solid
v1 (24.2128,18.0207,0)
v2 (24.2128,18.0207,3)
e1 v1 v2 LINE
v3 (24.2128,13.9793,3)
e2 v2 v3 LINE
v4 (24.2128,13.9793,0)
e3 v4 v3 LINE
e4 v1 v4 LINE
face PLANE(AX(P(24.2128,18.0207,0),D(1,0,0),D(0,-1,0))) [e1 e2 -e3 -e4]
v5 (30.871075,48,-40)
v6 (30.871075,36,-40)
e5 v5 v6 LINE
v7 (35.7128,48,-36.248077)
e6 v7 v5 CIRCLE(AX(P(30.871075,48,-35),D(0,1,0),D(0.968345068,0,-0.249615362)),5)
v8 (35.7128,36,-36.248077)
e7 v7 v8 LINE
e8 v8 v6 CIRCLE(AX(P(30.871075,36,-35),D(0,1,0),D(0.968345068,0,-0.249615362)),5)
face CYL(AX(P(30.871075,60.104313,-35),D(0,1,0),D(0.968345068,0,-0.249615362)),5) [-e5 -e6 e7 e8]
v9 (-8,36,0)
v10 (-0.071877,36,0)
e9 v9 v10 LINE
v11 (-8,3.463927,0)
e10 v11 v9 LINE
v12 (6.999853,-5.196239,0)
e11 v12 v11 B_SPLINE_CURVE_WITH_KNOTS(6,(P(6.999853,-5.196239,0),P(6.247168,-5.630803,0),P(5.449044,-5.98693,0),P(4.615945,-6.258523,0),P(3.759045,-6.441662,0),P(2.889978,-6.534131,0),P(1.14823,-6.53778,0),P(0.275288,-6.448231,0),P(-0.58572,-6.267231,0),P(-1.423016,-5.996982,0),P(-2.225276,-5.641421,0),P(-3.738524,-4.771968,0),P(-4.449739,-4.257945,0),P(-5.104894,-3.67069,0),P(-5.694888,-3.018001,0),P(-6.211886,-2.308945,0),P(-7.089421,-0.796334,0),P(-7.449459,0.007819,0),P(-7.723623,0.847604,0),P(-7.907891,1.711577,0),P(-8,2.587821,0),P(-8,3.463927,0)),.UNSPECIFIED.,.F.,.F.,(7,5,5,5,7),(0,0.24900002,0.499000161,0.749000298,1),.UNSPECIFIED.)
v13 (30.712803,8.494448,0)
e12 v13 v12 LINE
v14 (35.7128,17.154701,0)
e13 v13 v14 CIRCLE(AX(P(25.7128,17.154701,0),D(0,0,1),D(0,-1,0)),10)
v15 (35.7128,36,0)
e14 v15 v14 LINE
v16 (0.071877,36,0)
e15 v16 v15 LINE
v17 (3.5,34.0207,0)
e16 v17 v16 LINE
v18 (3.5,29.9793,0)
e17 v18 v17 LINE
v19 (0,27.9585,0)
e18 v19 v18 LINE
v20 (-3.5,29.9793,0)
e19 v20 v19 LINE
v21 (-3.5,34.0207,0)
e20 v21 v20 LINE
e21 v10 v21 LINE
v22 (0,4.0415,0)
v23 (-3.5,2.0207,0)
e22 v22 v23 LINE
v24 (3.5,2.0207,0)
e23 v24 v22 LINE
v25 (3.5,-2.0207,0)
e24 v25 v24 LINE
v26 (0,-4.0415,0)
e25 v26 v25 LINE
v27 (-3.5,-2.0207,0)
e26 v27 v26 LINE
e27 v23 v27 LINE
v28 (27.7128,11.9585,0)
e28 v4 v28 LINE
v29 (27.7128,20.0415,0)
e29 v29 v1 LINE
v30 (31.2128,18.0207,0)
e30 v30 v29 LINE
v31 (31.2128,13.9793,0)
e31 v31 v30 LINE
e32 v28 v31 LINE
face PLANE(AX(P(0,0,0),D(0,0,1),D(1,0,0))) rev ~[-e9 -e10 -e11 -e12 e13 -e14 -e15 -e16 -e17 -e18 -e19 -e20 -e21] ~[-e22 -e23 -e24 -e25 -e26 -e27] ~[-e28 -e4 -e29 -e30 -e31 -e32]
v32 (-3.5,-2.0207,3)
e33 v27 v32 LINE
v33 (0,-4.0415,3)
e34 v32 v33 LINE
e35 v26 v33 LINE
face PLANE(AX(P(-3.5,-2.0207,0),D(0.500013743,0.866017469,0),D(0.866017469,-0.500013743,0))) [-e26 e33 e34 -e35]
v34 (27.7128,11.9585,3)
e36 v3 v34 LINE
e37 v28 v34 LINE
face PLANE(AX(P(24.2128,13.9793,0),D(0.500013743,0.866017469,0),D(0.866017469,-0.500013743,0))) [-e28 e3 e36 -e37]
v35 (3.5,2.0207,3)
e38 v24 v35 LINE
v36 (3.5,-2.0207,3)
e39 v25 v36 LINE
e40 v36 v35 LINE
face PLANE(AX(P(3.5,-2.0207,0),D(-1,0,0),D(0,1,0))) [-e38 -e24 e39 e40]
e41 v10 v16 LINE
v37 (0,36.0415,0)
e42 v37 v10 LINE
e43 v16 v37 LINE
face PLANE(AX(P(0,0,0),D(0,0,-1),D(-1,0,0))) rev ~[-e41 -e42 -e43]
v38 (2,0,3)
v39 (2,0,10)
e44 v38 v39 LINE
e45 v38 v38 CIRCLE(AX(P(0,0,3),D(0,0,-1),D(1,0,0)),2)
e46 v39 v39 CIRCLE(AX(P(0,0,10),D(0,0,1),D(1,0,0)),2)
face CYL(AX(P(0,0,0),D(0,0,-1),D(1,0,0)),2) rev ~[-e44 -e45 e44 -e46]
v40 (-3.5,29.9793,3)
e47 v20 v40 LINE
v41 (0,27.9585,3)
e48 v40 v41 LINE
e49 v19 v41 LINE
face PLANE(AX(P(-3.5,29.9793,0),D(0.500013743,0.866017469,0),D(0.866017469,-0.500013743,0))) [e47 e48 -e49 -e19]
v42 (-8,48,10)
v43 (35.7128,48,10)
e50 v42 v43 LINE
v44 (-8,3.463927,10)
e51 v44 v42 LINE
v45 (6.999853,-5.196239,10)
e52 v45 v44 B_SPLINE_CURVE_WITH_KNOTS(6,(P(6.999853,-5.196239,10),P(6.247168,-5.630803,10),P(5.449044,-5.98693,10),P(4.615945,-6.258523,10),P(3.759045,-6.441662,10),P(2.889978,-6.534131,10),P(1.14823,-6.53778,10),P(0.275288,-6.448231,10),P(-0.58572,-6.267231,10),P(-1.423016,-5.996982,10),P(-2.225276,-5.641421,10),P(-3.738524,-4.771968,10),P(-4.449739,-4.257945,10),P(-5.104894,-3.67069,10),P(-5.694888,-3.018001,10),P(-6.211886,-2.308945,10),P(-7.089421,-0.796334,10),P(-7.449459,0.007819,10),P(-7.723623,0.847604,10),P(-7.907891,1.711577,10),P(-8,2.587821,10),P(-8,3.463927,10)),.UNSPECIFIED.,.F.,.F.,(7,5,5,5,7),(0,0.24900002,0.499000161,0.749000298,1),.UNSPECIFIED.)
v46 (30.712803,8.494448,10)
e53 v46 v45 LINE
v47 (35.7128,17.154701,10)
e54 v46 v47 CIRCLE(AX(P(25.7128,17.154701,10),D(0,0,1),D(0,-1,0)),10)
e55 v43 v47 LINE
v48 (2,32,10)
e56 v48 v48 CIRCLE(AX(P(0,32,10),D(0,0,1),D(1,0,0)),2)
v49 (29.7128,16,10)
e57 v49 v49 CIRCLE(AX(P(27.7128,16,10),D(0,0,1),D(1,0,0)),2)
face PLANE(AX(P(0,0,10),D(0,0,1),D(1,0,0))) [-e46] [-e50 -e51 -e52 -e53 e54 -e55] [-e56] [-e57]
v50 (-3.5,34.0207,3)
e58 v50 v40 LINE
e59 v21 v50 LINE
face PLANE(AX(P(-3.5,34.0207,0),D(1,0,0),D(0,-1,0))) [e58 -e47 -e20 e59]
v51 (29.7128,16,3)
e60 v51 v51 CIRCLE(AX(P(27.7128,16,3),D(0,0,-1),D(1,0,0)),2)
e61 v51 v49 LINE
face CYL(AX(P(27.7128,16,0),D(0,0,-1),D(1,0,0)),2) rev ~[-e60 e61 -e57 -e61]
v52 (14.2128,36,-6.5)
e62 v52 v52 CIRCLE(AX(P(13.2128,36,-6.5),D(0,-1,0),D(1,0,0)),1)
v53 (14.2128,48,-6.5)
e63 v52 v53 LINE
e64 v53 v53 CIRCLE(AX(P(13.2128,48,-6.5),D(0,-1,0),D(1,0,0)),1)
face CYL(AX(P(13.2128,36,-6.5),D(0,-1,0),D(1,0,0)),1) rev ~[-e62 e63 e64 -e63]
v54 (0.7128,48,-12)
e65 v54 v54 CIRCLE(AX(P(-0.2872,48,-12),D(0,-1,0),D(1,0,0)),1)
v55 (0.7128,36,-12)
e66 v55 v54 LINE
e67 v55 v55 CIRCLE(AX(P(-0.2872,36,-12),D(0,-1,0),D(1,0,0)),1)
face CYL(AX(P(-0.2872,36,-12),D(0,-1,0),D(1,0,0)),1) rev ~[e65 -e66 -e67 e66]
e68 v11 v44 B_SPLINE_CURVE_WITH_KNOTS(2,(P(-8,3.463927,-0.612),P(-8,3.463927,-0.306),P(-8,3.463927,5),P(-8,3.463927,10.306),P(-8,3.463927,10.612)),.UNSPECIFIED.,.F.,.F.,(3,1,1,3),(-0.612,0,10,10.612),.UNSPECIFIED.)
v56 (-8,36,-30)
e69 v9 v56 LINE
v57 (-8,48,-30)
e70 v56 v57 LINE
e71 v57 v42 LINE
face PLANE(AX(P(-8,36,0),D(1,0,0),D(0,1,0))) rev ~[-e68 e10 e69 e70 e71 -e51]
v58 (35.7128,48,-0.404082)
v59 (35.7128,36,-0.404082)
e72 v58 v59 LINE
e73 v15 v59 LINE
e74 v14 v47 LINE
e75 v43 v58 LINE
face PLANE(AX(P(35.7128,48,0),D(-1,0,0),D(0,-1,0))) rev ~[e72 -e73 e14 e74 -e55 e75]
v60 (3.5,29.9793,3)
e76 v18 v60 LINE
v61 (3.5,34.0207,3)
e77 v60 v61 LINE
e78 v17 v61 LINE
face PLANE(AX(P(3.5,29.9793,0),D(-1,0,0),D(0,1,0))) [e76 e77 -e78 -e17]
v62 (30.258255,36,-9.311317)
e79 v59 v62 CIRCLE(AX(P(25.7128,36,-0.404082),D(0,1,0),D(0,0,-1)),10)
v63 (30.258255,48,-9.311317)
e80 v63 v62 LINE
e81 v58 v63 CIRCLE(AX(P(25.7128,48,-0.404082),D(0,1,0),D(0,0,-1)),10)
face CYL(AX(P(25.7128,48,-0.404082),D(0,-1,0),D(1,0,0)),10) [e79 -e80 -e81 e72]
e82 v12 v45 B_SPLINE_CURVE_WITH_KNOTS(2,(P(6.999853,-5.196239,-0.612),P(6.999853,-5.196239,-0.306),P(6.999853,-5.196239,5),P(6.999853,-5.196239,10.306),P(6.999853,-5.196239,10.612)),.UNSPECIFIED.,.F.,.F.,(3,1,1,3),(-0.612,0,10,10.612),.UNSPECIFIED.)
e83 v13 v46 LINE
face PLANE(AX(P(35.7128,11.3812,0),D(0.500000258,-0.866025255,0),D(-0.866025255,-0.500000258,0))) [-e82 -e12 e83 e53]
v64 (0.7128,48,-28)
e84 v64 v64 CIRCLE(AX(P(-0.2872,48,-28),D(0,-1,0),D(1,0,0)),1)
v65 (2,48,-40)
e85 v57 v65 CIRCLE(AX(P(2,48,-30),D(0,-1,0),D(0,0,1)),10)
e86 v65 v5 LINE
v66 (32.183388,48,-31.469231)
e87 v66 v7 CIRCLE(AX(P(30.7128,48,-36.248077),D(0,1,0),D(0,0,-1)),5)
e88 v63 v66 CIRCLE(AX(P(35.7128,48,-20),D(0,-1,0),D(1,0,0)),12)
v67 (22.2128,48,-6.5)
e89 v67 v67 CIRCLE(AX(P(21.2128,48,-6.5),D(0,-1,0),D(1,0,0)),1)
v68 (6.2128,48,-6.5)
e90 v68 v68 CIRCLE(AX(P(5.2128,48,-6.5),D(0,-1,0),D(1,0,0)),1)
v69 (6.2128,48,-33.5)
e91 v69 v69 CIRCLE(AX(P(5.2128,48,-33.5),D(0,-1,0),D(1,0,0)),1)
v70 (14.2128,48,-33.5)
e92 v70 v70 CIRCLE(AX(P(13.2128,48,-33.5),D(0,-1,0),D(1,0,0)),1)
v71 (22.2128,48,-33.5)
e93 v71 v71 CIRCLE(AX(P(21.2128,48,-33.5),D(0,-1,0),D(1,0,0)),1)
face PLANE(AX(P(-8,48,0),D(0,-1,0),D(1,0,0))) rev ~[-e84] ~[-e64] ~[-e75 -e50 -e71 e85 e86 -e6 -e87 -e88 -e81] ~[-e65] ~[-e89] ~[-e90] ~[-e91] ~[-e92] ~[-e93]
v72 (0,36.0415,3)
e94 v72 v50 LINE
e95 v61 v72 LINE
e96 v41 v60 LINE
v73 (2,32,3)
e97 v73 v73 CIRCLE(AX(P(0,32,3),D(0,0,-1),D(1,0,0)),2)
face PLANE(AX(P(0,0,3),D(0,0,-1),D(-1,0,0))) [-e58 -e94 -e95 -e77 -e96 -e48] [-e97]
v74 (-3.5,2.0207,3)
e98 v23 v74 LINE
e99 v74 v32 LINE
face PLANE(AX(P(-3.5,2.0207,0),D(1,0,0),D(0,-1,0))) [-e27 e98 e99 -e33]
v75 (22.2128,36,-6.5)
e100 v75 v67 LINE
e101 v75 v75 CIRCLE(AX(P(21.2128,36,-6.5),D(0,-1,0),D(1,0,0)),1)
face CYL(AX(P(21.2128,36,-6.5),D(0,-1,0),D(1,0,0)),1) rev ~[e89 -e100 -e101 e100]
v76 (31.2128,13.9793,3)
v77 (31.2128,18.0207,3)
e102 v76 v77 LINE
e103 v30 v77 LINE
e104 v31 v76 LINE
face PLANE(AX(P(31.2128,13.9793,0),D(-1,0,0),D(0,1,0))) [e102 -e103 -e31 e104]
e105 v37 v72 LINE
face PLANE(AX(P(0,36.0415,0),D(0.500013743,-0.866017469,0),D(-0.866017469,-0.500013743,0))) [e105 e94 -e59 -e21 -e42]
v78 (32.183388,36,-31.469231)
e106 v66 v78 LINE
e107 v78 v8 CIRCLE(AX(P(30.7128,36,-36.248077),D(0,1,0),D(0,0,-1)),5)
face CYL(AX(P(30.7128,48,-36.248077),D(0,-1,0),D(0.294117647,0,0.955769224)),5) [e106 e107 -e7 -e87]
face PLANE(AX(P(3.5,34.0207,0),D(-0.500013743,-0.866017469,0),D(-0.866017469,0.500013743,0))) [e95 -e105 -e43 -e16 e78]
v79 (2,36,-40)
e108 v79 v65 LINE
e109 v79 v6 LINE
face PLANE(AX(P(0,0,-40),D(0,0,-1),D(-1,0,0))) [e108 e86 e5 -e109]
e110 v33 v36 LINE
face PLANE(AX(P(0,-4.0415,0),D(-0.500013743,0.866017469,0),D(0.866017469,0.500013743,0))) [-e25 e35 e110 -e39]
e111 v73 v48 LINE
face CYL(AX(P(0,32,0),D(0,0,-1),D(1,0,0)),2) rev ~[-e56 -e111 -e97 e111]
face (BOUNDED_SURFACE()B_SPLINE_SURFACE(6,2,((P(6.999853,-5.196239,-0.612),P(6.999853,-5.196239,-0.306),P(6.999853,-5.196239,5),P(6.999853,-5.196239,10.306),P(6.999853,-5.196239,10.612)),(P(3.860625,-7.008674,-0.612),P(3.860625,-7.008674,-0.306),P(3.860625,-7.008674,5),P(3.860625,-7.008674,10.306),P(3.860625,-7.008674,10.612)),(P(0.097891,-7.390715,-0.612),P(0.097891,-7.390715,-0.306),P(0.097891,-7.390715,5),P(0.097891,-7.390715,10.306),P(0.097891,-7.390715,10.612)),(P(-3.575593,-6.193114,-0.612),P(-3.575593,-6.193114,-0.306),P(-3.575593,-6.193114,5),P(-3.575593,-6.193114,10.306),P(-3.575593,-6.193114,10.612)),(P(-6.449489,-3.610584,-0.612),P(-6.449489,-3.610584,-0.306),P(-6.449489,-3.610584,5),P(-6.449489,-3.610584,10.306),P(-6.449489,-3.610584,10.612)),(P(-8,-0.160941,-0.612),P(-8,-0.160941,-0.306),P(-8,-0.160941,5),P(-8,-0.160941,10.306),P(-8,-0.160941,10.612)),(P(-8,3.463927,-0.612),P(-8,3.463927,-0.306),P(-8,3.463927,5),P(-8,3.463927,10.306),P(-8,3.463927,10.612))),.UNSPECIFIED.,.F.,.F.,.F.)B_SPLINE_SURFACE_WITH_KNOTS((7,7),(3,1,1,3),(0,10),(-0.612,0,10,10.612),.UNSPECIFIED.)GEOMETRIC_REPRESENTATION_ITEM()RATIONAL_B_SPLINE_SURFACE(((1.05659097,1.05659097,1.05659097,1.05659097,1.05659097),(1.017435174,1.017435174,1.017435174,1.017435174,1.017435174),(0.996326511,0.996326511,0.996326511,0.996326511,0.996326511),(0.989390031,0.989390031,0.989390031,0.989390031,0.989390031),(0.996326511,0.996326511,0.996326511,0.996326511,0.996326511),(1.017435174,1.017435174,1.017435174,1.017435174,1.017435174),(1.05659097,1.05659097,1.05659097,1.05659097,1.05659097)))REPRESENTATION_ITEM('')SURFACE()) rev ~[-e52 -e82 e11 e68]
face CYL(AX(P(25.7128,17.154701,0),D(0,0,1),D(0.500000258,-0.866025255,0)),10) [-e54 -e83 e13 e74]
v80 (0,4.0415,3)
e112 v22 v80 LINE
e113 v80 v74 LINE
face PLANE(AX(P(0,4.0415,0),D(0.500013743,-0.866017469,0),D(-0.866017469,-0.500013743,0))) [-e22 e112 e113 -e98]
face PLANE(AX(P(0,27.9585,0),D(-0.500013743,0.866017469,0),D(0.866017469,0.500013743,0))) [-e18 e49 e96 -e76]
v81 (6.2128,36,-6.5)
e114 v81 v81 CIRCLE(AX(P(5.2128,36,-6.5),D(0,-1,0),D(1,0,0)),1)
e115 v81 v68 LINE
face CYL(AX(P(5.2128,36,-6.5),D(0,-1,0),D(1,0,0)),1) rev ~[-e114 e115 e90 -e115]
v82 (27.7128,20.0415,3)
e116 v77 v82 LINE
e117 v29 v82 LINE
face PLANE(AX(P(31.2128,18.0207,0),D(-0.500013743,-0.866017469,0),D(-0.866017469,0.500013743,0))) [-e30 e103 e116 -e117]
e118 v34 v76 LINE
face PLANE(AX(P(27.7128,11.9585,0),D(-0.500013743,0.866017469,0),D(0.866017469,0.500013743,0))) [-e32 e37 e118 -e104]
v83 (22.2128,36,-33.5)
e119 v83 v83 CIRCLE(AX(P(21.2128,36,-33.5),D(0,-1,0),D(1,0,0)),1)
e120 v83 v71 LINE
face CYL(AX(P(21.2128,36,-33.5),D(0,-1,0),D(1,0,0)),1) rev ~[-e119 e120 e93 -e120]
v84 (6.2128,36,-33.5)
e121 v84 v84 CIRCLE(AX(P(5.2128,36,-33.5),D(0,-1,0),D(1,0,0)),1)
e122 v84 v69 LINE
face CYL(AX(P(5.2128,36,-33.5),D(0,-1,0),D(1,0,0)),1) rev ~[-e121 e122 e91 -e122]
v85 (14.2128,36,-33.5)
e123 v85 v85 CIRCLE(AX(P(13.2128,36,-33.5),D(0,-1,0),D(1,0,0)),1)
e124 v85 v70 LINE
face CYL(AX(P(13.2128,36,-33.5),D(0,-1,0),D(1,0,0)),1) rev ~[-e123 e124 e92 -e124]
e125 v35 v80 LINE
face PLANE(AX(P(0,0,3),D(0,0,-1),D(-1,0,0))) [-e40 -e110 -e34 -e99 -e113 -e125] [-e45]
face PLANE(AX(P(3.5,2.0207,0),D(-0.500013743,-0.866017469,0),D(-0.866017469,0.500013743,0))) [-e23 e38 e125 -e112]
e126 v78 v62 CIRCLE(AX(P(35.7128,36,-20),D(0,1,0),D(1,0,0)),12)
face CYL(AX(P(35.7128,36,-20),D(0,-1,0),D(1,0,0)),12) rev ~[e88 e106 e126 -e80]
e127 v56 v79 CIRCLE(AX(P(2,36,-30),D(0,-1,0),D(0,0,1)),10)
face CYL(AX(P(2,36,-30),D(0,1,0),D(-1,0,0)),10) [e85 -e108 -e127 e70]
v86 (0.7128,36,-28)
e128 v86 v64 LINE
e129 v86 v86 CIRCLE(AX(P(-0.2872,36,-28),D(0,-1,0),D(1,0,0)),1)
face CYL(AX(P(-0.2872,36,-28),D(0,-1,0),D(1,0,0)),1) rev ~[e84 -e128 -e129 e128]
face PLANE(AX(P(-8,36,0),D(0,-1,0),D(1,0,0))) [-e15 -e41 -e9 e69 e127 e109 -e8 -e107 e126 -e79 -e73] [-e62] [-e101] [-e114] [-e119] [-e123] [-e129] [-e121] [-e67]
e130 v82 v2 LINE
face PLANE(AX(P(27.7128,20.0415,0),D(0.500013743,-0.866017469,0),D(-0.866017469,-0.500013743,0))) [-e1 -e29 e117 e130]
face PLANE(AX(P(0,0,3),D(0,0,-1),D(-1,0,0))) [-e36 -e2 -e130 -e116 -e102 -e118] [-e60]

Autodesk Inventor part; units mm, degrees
ref_plane "YZ Plane" through (0, 0, 0) normal (1, 0, 0) x (0, 1, 0)
ref_plane "XZ Plane" through (0, 0, 0) normal (0, 1, 0) x (-1, 0, 0)
ref_plane "XY Plane" through (0, 0, 0) normal (0, 0, 1) x (1, 0, 0)
sketch "Esquisse1" plane through (0, 0, 0) normal (0, 0, 1) x (1, 0, 0)
  line L0 (0, 0) -> (0, 32) construction
  line L1 (0, 32) -> (27.7128, 16) construction
  line L2 (27.7128, 16) -> (0, 0) construction
  circle A0 centre (0, 0) radius 2
  circle A1 centre (0, 32) radius 2
  circle A2 centre (27.7128, 16) radius 2
  line L3 (0, 32) -> (0, 48) construction
  line L4 (35.7128, 48) -> (35.7128, 11.3812)
  line L5 (2.1436, -8) -> (-8, -8)
  line L6 (-8, -8) -> (-8, 48)
  line L7 (-8, 48) -> (35.7128, 48)
  line L8 (27.7128, 16) -> (35.7128, 16) construction
  line L9 (0, 0) -> (0, -8) construction
  line L10 (0, 32) -> (-8, 32) construction
  line L11 (27.7128, 16) -> (31.7128, 9.0718) construction
  line L12 (35.7128, 11.3812) -> (2.1436, -8)
  dimension "d0" = 32
  dimension "d1" = 32
  dimension "d2" = 32
  dimension "d3" = 4
  dimension "d4" = 16
  dimension "d5" = 8
  dimension "d6" = 8
  dimension "d7" = 8
  dimension "d27" = 8
extrude "Extrusion1" add sketch "Esquisse1" along normal blind 10
sketch "Esquisse2" plane through (0, 0, 0) normal (0, 0, -1) x (-1, 0, 0)
  circle A0 centre (-27.7128, 16) radius 2 projected
  circle A1 centre (0, 32) radius 2 projected
  circle A2 centre (0, 0) radius 2 projected
  line L0 (-35.7128, 48) -> (-35.7128, -8) projected
  line L1 (8, -8) -> (8, 48) projected
  line L2 (8, 48) -> (-35.7128, 48) projected
  line L3 (0, 27.9585) -> (-3.5, 29.9793)
  line L4 (-3.5, 29.9793) -> (-3.5, 34.0207)
  line L5 (-3.5, 34.0207) -> (0, 36.0415)
  line L6 (0, 36.0415) -> (3.5, 34.0207)
  line L7 (3.5, 34.0207) -> (3.5, 29.9793)
  line L8 (3.5, 29.9793) -> (0, 27.9585)
  line L9 (-3.5, 2.0207) -> (0, 4.0415)
  line L10 (0, 4.0415) -> (3.5, 2.0207)
  line L11 (3.5, 2.0207) -> (3.5, -2.0207)
  line L12 (3.5, -2.0207) -> (0, -4.0415)
  line L13 (0, -4.0415) -> (-3.5, -2.0207)
  line L14 (-3.5, -2.0207) -> (-3.5, 2.0207)
  line L15 (-3.5, 29.9793) -> (3.5, 29.9793) construction
  line L16 (-24.2128, 13.9793) -> (-27.7128, 11.9585)
  line L17 (-27.7128, 11.9585) -> (-31.2128, 13.9793)
  line L18 (-31.2128, 13.9793) -> (-31.2128, 18.0207)
  line L19 (-31.2128, 18.0207) -> (-27.7128, 20.0415)
  line L20 (-27.7128, 20.0415) -> (-24.2128, 18.0207)
  line L21 (-24.2128, 18.0207) -> (-24.2128, 13.9793)
  point P0 (-2.1436, -8)
  dimension "d10" = 7
extrude "Extrusion2" cut sketch "Esquisse2" against normal blind 3
sketch "Esquisse5" plane through (0, 0, 0) normal (0, 0, -1) x (-1, 0, 0)
  line L0 (-35.7128, 48) -> (-35.7128, 11.3812) projected
  line L1 (8, -8) -> (8, 48) projected
  line L2 (8, 48) -> (-35.7128, 48) projected
  line L3 (-35.7128, 48) -> (8, 48)
  line L4 (8, 48) -> (8, 36)
  line L5 (8, 36) -> (-35.7128, 36)
  line L6 (-35.7128, 36) -> (-35.7128, 48)
  point P0 (0, 0)
  dimension "d28" = 12
extrude "Extrusion5" add sketch "Esquisse5" along normal blind 40
sketch "Esquisse6" plane through (0.0718, 36, 0) normal (0, -1, 0) x (1, 0, 0)
  line L0 (-8.0718, 0) -> (-8.0718, -40) projected
  line L1 (35.641, 0) -> (35.641, -40) projected
  line L2 (35.641, -20) -> (-8.0718, -20) construction
  circle A0 centre (35.641, -20) radius 12
  line L3 (35.641, -20) -> (35.641, -6.5) construction
  line L4 (35.641, -6.5) -> (29.141, -6.5) construction
  line L5 (29.141, -6.5) -> (21.141, -6.5) construction
  line L6 (21.141, -6.5) -> (13.141, -6.5) construction
  line L7 (13.141, -6.5) -> (5.141, -6.5) construction
  line L8 (35.641, -20) -> (-0.359, -20) construction
  line L9 (-0.359, -20) -> (-0.359, -12) construction
  circle A1 centre (-0.359, -12) radius 1
  circle A2 centre (5.141, -6.5) radius 1
  circle A3 centre (13.141, -6.5) radius 1
  circle A4 centre (21.141, -6.5) radius 1
  circle A5 centre (-0.359, -28) radius 1
  circle A6 centre (5.141, -33.5) radius 1
  circle A7 centre (13.141, -33.5) radius 1
  circle A8 centre (21.141, -33.5) radius 1
  point P0 (-0.0718, 0)
  dimension "d31" = 24
  dimension "d32" = 13.5
  dimension "d33" = 6.5
  dimension "d34" = 8
  dimension "d35" = 8
  dimension "d36" = 8
  dimension "d37" = 36
  dimension "d38" = 8
  dimension "d39" = 2
extrude "Extrusion6" cut sketch "Esquisse6" against normal through all
fillet "Congé1" radius 10 1 edges at (-8, -8, 5)
fillet "Congé2" radius 10 1 edges at (35.7128, 11.3812, 5)
fillet "Congé3" radius 10 1 edges at (2.1436, -8, 5)
fillet "Congé4" radius 10 1 edges at (-8, 42, -40)
fillet "Congé5" radius 10 1 edges at (35.7128, 42, -8)
fillet "Congé6" radius 5 1 edges at (35.7128, 42, -32)
fillet "Congé7" radius 5 1 edges at (35.7128, 42, -40)
properties part number "joint3+ax12imprint_v4"
